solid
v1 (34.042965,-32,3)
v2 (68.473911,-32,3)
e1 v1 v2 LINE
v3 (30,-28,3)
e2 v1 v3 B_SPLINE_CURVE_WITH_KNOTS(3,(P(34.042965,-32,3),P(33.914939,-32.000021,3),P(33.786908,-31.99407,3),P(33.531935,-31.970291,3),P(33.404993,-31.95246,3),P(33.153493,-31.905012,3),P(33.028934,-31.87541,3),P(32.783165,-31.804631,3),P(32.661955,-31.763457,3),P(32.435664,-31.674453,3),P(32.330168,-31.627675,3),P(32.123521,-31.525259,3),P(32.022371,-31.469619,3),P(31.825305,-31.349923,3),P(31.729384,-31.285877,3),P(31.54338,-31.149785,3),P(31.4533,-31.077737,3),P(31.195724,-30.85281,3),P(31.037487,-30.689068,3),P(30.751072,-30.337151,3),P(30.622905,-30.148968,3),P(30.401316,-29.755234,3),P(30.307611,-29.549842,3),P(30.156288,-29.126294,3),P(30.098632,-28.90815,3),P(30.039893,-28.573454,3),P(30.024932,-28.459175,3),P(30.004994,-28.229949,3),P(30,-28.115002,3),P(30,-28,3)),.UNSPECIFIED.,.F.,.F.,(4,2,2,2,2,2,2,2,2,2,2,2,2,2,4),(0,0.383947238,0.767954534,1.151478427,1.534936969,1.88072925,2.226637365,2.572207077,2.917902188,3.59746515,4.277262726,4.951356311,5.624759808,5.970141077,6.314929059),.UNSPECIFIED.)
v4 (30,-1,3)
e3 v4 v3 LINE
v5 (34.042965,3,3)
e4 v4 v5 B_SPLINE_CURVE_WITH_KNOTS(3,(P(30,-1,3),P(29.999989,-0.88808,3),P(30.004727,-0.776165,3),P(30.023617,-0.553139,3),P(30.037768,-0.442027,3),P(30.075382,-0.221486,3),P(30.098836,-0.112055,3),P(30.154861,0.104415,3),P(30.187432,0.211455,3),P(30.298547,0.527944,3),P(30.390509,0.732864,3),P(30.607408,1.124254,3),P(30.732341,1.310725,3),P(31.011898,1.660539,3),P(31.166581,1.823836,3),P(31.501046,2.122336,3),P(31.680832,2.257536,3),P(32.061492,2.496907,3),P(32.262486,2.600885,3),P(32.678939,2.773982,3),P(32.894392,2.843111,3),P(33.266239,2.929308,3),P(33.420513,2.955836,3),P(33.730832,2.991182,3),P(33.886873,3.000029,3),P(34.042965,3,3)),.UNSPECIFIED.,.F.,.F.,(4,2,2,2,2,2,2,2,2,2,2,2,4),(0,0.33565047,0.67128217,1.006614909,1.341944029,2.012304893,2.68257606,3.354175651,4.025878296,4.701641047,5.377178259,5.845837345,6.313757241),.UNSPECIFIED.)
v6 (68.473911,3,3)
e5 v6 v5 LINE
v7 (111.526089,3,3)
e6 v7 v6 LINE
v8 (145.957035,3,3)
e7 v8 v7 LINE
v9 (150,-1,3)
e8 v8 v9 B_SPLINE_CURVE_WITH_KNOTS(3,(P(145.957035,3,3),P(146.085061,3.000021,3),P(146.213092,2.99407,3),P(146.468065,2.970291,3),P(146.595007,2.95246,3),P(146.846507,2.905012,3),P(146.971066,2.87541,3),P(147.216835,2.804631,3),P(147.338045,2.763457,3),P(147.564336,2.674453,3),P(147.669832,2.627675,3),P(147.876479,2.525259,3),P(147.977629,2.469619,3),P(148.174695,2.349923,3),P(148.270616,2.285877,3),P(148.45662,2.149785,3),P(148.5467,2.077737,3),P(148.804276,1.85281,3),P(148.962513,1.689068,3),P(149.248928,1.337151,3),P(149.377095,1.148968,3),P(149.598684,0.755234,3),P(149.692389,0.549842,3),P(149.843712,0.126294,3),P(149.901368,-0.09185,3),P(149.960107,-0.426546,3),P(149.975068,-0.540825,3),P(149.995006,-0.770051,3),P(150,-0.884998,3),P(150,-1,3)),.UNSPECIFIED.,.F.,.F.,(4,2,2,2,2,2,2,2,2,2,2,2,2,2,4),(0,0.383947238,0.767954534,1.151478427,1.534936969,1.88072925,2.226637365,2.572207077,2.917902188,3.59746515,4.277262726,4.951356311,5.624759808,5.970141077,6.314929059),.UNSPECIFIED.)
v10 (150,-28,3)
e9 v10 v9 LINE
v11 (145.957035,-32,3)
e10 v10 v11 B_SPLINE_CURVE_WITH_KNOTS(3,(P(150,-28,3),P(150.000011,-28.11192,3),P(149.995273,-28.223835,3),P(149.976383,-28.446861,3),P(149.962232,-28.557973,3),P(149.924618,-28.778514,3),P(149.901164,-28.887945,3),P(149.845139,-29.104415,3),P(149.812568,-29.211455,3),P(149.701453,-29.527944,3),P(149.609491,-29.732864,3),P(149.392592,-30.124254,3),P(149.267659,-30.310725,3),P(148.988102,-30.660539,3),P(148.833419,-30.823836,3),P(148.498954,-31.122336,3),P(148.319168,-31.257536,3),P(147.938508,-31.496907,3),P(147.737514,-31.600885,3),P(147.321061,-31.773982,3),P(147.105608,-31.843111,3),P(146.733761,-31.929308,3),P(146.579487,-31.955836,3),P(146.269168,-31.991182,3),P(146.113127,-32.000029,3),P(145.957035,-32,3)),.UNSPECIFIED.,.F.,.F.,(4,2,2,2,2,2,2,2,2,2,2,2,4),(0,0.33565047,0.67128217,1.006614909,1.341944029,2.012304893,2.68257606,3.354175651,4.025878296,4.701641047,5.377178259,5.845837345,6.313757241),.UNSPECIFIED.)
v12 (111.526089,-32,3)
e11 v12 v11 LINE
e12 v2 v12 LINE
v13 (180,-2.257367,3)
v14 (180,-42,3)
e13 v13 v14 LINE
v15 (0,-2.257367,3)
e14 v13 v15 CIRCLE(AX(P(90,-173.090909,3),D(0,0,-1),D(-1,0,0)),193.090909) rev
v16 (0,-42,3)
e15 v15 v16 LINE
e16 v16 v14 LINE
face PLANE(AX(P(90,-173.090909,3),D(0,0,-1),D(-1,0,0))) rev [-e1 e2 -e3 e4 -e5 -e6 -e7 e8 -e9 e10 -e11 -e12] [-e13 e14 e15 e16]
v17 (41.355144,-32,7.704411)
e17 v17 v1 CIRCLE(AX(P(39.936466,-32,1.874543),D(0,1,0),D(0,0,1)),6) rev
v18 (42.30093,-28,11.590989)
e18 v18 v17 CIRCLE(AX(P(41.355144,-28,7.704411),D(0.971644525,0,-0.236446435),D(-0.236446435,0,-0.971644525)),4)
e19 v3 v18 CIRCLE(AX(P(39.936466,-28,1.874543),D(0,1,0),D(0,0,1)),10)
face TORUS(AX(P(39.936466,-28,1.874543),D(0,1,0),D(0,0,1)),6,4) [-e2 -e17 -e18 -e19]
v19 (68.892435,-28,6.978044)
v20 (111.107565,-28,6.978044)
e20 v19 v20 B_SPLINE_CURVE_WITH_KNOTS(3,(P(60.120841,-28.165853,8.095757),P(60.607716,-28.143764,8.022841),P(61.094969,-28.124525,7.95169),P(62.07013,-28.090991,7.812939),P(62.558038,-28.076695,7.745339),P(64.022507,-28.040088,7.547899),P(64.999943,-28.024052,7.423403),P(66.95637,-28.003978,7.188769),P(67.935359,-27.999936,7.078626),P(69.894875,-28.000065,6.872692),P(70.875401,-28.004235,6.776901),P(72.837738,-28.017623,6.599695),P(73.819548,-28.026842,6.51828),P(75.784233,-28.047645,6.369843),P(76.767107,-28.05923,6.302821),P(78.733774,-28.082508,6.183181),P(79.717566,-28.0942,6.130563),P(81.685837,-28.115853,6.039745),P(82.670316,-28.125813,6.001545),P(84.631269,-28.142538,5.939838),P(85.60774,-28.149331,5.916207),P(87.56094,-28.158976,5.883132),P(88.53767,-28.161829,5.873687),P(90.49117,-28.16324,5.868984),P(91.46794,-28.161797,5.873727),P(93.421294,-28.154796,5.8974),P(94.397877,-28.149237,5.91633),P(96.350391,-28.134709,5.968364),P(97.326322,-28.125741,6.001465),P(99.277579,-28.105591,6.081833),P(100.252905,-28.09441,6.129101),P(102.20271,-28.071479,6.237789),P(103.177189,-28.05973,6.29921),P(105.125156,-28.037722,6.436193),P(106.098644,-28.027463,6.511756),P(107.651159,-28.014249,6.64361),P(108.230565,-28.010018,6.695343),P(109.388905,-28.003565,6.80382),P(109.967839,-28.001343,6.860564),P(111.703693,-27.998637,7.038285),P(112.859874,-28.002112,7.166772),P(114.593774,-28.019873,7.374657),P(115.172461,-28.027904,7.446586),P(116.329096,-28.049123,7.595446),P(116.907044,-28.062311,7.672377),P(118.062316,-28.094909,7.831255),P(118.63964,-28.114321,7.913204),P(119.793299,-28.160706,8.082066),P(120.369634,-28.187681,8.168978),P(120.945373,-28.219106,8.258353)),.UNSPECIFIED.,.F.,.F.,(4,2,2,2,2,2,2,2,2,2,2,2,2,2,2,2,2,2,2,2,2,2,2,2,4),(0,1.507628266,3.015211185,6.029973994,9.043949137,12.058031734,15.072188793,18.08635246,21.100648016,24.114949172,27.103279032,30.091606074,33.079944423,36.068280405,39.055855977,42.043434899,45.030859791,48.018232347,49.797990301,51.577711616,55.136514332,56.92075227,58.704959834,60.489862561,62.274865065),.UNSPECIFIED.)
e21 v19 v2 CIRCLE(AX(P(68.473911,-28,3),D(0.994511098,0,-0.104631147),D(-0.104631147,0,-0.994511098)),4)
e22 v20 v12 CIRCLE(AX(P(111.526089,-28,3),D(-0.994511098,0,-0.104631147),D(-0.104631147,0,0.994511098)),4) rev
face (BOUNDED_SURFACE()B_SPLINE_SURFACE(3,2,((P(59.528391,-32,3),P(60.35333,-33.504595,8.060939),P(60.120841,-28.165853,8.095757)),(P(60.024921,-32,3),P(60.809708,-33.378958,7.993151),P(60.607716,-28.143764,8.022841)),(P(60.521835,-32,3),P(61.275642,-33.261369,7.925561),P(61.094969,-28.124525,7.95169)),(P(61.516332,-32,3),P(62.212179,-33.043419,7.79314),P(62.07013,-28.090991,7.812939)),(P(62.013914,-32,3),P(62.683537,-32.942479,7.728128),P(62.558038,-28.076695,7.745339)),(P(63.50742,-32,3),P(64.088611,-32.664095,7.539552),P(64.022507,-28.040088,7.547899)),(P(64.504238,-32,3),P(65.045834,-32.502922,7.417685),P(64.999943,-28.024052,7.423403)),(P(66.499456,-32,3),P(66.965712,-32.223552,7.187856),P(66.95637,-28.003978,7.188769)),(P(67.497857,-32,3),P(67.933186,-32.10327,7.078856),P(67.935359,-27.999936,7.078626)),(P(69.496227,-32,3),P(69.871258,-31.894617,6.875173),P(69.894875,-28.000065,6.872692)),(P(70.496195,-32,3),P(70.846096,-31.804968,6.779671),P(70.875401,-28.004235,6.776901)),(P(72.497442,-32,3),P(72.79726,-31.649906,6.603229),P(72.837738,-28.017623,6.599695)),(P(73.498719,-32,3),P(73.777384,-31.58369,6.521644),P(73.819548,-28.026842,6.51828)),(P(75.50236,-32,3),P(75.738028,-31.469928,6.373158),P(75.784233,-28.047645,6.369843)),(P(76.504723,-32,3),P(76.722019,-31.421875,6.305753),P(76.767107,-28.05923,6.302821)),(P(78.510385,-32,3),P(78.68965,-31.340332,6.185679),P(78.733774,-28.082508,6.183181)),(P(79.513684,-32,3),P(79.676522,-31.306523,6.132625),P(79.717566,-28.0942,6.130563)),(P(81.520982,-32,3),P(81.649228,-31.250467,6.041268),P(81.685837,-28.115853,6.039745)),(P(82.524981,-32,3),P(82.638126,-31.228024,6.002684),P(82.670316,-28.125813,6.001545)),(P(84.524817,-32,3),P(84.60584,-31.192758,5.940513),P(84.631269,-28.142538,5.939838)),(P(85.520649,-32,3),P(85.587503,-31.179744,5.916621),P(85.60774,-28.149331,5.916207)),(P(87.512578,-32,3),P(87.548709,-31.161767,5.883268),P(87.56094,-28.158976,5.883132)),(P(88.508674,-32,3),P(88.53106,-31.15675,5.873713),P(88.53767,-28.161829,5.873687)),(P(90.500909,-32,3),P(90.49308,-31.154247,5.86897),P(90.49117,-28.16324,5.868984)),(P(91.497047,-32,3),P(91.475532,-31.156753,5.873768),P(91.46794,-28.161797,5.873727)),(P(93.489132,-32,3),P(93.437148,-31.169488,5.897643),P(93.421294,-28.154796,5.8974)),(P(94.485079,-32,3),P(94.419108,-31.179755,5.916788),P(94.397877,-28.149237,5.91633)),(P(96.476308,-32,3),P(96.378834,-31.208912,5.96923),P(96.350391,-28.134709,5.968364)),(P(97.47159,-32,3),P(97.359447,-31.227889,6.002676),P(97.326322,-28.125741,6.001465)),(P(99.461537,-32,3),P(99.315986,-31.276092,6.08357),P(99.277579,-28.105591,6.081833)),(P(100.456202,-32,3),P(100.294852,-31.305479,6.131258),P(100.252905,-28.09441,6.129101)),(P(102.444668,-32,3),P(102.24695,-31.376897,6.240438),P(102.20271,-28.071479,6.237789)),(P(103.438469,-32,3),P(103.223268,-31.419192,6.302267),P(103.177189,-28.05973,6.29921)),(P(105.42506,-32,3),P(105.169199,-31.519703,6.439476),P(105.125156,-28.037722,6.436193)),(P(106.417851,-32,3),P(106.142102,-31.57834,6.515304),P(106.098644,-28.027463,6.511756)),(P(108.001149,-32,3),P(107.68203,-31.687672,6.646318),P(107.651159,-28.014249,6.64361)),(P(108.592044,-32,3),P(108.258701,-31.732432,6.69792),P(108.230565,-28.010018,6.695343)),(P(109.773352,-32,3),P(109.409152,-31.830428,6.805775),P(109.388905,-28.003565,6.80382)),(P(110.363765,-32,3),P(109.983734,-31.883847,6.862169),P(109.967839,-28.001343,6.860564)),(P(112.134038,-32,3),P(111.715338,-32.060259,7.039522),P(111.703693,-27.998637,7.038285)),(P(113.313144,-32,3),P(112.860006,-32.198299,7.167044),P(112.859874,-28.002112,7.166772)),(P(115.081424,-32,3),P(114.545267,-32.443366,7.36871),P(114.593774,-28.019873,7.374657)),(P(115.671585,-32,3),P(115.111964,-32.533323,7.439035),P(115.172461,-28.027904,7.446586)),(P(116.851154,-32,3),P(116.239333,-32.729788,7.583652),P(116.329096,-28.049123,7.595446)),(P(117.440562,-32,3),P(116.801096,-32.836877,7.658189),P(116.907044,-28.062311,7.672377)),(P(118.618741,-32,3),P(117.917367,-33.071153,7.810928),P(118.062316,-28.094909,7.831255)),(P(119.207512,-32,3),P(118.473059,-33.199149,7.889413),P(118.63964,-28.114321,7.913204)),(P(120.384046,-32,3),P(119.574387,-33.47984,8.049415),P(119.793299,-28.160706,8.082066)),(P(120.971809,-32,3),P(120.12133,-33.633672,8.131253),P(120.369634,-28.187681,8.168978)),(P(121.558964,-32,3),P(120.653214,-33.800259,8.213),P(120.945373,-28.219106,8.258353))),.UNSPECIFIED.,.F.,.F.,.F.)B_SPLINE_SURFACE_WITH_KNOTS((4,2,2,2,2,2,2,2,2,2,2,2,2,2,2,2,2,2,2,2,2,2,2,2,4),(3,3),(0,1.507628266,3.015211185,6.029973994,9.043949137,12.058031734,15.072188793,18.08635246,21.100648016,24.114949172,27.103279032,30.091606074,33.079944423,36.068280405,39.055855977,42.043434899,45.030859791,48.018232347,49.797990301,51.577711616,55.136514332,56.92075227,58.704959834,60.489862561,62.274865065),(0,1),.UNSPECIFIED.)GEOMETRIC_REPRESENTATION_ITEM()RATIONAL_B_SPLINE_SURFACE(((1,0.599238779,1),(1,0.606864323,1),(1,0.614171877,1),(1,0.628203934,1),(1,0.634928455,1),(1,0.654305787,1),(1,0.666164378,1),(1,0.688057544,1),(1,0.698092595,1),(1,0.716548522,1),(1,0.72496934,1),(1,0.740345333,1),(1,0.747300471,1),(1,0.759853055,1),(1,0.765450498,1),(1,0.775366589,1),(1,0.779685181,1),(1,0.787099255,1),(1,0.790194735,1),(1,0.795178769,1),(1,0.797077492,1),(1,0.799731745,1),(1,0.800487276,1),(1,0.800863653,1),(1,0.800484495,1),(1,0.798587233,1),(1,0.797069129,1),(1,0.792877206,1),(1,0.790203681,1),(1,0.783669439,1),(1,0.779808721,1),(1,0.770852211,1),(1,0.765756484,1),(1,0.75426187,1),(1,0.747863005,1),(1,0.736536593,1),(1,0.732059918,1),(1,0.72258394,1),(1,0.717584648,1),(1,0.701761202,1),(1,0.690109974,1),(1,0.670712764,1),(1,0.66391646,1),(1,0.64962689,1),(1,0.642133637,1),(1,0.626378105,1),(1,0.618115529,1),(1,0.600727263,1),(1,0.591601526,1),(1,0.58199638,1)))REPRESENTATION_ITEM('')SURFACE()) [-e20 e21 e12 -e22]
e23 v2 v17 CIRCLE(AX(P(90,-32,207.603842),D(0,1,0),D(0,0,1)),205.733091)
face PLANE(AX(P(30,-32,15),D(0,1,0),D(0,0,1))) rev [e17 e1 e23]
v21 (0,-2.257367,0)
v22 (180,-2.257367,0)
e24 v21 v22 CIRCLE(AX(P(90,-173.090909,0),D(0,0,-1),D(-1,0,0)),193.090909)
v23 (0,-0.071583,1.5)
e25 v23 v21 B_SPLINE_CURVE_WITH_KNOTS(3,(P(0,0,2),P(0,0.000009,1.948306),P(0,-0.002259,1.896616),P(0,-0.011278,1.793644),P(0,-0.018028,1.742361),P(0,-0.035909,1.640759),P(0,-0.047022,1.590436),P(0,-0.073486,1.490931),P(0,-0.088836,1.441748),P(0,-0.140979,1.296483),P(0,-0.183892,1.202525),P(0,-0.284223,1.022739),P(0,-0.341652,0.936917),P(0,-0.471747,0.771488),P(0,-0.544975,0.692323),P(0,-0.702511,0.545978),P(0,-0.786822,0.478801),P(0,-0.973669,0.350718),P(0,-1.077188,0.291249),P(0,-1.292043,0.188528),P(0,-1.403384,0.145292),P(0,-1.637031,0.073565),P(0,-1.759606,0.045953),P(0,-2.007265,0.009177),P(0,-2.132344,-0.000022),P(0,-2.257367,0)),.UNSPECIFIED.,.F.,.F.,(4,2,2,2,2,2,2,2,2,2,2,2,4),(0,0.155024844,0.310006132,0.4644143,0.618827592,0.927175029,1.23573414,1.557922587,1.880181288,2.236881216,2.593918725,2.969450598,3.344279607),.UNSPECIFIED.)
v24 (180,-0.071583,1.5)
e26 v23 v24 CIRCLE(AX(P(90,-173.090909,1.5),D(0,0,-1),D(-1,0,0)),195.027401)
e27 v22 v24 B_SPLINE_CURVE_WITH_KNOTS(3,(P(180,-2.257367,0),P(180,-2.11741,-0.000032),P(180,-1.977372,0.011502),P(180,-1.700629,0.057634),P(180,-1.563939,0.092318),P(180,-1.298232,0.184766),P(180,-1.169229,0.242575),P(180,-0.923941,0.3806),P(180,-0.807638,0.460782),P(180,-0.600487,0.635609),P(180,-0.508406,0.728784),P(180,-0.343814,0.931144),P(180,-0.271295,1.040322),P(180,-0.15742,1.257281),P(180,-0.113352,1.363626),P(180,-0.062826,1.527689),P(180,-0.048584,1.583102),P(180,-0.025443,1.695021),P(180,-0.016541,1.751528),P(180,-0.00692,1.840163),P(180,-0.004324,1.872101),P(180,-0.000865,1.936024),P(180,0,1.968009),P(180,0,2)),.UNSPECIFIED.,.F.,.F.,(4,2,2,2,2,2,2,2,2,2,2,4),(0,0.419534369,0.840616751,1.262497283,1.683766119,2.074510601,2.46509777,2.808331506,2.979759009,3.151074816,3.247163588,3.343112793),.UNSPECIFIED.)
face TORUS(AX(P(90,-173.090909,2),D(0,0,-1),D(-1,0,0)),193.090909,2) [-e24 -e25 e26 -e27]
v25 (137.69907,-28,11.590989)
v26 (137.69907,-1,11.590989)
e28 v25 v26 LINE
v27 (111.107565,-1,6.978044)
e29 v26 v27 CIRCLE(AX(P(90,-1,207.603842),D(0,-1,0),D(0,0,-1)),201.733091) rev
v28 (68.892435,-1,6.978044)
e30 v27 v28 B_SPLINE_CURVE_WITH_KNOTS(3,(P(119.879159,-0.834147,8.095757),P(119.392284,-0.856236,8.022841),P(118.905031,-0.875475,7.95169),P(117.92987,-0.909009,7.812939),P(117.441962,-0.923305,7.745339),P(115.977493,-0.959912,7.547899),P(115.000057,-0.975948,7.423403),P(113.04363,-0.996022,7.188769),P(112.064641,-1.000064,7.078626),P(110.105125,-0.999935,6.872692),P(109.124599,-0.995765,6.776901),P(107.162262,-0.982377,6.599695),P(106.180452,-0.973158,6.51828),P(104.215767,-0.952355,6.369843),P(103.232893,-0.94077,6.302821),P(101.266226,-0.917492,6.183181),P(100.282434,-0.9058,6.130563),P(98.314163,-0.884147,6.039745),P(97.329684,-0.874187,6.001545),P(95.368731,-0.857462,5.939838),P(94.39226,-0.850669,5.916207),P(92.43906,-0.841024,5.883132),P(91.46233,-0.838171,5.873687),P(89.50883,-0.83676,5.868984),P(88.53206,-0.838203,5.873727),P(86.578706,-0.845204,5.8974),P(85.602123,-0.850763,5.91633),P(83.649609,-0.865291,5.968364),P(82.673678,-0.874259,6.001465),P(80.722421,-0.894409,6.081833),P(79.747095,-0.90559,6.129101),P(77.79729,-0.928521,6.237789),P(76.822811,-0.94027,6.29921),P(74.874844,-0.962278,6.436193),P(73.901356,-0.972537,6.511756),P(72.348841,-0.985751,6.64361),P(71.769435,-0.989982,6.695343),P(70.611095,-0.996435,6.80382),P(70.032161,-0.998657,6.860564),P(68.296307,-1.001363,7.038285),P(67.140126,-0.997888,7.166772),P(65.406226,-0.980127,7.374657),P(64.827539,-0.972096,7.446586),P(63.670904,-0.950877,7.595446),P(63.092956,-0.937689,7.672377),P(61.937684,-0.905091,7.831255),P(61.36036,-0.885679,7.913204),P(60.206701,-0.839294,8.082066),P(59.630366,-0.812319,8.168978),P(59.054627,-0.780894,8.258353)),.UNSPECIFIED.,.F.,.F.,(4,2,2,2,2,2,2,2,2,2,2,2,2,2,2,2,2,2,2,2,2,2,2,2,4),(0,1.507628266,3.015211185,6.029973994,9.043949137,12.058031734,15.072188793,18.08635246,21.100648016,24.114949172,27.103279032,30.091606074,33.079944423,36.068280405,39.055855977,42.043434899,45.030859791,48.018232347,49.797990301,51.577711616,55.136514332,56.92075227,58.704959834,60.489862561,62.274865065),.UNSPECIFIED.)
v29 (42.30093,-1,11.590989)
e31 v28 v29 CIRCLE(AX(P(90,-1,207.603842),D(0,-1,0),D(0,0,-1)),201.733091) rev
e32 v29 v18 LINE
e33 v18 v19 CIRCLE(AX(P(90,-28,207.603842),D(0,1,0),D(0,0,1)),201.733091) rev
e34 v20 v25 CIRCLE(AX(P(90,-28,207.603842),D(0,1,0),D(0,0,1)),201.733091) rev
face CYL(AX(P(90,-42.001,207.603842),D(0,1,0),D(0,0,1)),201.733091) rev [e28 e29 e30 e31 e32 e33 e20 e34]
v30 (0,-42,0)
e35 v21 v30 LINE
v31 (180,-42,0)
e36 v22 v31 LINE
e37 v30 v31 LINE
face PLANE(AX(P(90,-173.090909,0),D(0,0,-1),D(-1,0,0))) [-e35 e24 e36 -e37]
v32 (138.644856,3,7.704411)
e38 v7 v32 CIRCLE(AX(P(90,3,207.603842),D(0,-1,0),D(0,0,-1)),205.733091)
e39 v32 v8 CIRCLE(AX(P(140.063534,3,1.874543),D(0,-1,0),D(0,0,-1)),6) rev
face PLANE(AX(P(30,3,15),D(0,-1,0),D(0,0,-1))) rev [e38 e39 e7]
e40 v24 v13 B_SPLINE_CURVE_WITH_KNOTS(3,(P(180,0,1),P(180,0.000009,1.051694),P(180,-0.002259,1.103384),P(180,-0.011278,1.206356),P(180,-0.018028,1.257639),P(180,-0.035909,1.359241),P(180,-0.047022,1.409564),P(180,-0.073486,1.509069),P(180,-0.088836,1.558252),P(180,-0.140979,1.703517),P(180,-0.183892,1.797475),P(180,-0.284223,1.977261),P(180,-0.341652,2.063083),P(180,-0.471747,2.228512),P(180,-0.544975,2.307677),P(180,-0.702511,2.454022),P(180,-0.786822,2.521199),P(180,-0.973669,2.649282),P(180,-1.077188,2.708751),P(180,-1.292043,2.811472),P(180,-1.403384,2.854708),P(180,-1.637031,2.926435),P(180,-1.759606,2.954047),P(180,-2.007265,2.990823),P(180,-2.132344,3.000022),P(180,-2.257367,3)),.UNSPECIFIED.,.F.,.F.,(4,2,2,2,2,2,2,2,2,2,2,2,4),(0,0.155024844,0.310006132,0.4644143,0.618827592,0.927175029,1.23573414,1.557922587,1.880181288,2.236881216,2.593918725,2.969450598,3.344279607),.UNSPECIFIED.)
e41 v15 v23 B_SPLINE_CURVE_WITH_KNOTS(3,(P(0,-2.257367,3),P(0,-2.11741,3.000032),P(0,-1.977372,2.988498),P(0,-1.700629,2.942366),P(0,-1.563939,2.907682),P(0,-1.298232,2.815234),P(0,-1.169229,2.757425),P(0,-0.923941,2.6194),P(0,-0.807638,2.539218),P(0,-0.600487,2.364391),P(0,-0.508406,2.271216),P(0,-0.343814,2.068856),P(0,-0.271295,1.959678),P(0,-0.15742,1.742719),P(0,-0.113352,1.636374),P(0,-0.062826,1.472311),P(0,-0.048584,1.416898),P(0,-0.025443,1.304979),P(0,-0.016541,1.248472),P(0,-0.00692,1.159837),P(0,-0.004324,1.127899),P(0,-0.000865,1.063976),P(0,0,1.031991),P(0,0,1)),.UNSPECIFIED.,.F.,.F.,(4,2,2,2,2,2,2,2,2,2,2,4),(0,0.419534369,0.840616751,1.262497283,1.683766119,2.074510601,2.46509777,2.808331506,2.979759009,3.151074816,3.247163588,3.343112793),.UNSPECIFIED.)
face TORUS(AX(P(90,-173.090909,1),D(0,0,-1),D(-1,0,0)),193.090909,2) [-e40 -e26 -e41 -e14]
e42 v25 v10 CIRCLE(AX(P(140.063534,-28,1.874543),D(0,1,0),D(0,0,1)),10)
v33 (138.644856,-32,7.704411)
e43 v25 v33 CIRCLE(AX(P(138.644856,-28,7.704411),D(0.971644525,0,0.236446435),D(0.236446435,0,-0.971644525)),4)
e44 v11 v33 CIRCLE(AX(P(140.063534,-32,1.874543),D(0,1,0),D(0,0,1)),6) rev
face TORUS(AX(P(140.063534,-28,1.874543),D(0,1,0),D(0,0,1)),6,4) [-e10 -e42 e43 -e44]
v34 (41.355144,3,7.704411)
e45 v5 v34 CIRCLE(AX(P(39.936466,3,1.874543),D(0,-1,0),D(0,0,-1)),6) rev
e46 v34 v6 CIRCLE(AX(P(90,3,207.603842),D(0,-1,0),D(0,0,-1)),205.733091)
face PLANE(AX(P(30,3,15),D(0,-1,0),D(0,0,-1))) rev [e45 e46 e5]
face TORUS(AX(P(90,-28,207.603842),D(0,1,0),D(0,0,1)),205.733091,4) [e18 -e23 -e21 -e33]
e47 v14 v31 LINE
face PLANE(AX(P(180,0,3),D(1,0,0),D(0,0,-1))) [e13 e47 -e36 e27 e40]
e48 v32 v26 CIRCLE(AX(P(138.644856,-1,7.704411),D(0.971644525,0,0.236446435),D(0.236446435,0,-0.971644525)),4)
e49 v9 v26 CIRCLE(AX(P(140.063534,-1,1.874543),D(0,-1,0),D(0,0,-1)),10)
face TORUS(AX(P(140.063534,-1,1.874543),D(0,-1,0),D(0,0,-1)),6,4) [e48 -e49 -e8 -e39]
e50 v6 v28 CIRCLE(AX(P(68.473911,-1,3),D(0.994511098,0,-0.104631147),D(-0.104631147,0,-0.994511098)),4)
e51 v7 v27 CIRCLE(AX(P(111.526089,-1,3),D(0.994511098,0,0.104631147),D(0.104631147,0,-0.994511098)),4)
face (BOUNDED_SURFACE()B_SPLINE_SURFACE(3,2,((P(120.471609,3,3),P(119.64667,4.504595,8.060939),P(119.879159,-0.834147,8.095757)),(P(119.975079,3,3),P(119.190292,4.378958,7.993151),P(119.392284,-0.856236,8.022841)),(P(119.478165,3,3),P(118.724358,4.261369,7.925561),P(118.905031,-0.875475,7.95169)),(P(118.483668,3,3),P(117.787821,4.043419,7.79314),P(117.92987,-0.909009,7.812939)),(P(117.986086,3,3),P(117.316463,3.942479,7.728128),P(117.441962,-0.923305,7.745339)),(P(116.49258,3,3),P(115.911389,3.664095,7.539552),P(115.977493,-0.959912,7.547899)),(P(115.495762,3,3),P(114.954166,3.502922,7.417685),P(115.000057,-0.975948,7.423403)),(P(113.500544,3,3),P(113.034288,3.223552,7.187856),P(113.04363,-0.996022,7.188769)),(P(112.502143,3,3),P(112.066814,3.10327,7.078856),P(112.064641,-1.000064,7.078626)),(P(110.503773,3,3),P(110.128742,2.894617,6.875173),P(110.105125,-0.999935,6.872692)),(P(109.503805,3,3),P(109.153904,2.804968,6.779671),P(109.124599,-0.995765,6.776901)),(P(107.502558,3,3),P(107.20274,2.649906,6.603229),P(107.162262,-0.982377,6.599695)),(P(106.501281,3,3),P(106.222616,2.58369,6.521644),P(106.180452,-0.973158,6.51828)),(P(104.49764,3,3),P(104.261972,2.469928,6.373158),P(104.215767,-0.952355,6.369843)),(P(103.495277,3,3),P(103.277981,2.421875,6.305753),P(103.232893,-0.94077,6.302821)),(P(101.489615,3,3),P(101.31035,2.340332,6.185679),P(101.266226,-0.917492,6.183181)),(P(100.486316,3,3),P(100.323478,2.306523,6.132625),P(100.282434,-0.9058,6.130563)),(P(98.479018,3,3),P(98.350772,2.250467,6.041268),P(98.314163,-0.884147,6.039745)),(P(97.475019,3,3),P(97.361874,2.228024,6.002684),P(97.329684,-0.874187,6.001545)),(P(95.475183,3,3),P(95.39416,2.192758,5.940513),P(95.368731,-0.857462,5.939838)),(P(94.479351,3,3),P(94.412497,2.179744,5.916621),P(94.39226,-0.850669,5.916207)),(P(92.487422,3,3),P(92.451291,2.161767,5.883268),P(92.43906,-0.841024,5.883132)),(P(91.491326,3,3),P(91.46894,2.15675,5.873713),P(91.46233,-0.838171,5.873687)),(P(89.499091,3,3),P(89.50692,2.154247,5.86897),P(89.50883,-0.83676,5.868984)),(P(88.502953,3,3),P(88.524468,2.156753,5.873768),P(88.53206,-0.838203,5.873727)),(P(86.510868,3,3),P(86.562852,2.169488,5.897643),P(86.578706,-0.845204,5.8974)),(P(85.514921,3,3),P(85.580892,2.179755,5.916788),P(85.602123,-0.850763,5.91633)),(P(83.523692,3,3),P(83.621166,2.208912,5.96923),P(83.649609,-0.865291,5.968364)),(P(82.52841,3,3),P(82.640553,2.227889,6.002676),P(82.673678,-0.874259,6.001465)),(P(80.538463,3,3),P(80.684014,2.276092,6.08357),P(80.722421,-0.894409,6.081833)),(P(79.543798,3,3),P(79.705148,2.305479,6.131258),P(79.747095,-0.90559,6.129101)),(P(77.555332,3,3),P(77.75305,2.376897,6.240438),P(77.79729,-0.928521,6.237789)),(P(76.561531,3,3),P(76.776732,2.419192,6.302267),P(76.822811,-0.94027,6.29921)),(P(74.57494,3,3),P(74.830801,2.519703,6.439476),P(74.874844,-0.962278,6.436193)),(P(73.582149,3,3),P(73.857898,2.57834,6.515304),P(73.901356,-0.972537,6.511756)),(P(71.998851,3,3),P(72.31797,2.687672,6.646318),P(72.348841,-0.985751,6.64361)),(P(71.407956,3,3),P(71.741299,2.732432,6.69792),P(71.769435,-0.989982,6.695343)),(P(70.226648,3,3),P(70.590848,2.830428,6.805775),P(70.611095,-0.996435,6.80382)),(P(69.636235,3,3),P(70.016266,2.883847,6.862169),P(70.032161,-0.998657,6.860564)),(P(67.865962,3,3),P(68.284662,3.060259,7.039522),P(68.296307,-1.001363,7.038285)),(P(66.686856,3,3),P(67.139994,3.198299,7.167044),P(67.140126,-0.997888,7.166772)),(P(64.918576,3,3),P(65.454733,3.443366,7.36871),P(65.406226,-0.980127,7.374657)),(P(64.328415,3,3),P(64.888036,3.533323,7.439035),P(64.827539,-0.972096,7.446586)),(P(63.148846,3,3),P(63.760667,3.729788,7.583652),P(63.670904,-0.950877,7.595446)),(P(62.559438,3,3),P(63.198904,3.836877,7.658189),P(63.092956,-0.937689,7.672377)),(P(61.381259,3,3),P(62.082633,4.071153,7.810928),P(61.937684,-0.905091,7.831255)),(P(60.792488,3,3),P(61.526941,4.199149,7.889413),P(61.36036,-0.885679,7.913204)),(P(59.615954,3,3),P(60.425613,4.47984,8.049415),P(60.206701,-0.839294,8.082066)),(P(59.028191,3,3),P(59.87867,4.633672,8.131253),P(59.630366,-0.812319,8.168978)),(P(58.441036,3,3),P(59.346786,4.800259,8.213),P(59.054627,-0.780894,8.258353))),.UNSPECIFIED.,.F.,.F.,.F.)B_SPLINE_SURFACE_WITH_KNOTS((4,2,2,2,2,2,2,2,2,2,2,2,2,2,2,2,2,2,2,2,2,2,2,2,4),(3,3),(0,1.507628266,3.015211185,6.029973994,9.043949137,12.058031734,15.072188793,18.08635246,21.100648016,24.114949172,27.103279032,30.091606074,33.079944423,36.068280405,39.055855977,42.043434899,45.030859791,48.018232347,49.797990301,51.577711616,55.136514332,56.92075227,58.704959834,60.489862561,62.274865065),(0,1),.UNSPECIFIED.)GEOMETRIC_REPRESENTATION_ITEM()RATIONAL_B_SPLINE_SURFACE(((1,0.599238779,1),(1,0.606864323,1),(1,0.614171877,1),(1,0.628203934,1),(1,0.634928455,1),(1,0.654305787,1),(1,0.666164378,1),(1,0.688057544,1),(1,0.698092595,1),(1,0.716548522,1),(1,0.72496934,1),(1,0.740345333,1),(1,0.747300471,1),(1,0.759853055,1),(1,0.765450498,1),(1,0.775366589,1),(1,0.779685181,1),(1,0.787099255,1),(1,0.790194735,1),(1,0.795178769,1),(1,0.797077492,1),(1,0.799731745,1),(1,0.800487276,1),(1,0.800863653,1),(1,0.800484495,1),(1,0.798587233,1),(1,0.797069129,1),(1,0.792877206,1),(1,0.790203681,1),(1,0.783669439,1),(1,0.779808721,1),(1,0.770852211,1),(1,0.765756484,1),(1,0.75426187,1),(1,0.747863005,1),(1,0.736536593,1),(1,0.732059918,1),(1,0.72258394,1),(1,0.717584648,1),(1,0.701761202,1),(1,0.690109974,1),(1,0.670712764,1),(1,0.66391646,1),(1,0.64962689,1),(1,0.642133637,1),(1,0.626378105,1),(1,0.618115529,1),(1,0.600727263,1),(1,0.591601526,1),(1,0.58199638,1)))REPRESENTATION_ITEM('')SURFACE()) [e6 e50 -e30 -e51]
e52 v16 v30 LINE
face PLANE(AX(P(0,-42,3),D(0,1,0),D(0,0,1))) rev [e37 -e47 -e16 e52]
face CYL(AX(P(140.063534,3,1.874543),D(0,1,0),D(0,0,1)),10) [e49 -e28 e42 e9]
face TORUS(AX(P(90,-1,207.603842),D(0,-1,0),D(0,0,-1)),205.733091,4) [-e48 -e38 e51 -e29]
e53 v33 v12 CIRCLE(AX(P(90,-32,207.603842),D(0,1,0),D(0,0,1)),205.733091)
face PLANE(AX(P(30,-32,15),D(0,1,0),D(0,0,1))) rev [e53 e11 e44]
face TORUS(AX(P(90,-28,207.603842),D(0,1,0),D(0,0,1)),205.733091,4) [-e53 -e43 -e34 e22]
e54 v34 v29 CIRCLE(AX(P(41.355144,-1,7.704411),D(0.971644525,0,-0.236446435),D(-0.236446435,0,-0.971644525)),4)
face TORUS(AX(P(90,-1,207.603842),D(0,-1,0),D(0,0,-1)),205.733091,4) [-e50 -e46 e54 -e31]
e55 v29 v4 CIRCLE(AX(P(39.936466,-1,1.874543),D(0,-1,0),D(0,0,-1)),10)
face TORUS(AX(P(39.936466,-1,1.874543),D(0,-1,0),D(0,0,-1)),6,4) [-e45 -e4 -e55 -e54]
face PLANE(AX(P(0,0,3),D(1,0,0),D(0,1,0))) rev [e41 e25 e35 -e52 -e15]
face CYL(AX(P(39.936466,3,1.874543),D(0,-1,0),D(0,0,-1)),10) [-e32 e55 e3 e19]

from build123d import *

# Parameters (mm, degrees)
BOSS_EXTRUDE1_DEPTH = 3
SKETCH2_W           = 120
SKETCH2_H           = 35
BOSS_EXTRUDE2_DEPTH = 12
CUT_EXTRUDE1_REACH  = 188.145
FILLET1_R           = 10
FILLET2_R           = 4
FILLET3_R           = 2


with BuildPart() as part:
    # Sketch1 → Boss-Extrude1 (new body)
    with BuildSketch(Plane.XY):
        with BuildLine():
            Line((180, 0), (180, -42))
            Line((180, -42), (0, -42))
            Line((0, -42), (0, 0))
            ThreePointArc((0, 0), (90, 22), (180, 0))
        make_face()
    extrude(amount=BOSS_EXTRUDE1_DEPTH)

    # Sketch2 → Boss-Extrude2 (add)
    with BuildSketch(Plane.XY.offset(3)):
        with Locations((90, -14.5)):
            Rectangle(SKETCH2_W, SKETCH2_H)
    extrude(amount=BOSS_EXTRUDE2_DEPTH)

    # Sketch3 → Cut-Extrude1 (cut, up to next)
    with BuildSketch(Plane(origin=(0, 3, 0), x_dir=(1, 0, 0), z_dir=(0, 1, 0)), mode=Mode.PRIVATE) as cut_extrude1_sk1:
        with BuildLine():
            Line((30, -15), (150, -15))
            ThreePointArc((150, -15), (90, -5.870751133), (30, -15))
        make_face()
    cut_extrude1_tool1 = extrude(cut_extrude1_sk1.sketch, amount=-CUT_EXTRUDE1_REACH, mode=Mode.PRIVATE) & part.part
    add(cut_extrude1_tool1.solids().sort_by_distance((90, 3, 11.341124))[0], mode=Mode.SUBTRACT)

    # Fillet1
    # the kernel refuses this fillet: 10 mm, written as the material it takes off along each edge
    with BuildSketch(Plane(origin=(150, 34.911423728, 15), x_dir=(0, 0, -1), z_dir=(0, -1, 0)), Plane(origin=(30, -63.911423728, 15), x_dir=(0, 0, -1), z_dir=(0, 1, 0))) as fillet1_piece_1:
        with BuildLine():
            CenterArc((13.125456564, -9.936465545), FILLET1_R, 96.462082414, 97.214818073)
            Line((3.409011311, -12.300929891), (3.214682406, -12.348219178))
            ThreePointArc((3.214682406, -12.348219178), (1.609086457, -6.176908891), (-0.190949181, -0.059484539))
            Line((-0.190949181, -0.059484539), (0, 0.2))
            ThreePointArc((0, 0.2), (6, 0.2), (11.977490869, 0.198729311))
            Line((11.977490869, 0.198729311), (12, 0))
        make_face()
    extrude(amount=98.822847456, mode=Mode.SUBTRACT)

    # Fillet2
    fillet2_edges = [part.edges().sort_by_distance(p)[0] for p in [
        (90, -32, 5.870751133),
        (90, 3, 5.870751133),
        (34.210640521, 3, 10.073014501),
        (145.789359479, 3, 10.073014501),
        (34.210640521, -32, 10.073014501),
        (145.789359479, -32, 10.073014501),
    ]]
    fillet(fillet2_edges, radius=FILLET2_R)

    # Fillet3
    # the kernel refuses this fillet: 2 mm, written as the material it takes off along each edge
    with BuildSketch(Plane(origin=(90, -173.090909091, 0), x_dir=(-0.4839116978541771, 0.8751168314458863, 0), z_dir=(-0.8751168314458863, -0.4839116978541771, 0))) as fillet3_piece_1:
        with BuildLine():
            CenterArc((195.090909091 - FILLET3_R, -FILLET3_R), FILLET3_R, 0, 90)
            Line((195.090909091 - FILLET3_R, 0), (195.090909091, 0))
            Line((195.090909091, 0), (195.090909091, -FILLET3_R))
        make_face()
    revolve(axis=Axis((90, -173.090909091, 0), (0, 0, -1)), revolution_arc=57.882388788, mode=Mode.SUBTRACT)
    with BuildSketch(Plane(origin=(90, -173.090909091, 3), x_dir=(-0.4839116978541771, 0.8751168314458863, 0), z_dir=(-0.8751168314458863, -0.4839116978541771, 0))) as fillet3_piece_2:
        with BuildLine():
            CenterArc((195.090909091 - FILLET3_R, FILLET3_R), FILLET3_R, 270, 90)
            Line((195.090909091, FILLET3_R), (195.090909091, 0))
            Line((195.090909091, 0), (195.090909091 - FILLET3_R, 0))
        make_face()
    revolve(axis=Axis((90, -173.090909091, 3), (0, 0, -1)), revolution_arc=57.882388788, mode=Mode.SUBTRACT)


solid = part.part
